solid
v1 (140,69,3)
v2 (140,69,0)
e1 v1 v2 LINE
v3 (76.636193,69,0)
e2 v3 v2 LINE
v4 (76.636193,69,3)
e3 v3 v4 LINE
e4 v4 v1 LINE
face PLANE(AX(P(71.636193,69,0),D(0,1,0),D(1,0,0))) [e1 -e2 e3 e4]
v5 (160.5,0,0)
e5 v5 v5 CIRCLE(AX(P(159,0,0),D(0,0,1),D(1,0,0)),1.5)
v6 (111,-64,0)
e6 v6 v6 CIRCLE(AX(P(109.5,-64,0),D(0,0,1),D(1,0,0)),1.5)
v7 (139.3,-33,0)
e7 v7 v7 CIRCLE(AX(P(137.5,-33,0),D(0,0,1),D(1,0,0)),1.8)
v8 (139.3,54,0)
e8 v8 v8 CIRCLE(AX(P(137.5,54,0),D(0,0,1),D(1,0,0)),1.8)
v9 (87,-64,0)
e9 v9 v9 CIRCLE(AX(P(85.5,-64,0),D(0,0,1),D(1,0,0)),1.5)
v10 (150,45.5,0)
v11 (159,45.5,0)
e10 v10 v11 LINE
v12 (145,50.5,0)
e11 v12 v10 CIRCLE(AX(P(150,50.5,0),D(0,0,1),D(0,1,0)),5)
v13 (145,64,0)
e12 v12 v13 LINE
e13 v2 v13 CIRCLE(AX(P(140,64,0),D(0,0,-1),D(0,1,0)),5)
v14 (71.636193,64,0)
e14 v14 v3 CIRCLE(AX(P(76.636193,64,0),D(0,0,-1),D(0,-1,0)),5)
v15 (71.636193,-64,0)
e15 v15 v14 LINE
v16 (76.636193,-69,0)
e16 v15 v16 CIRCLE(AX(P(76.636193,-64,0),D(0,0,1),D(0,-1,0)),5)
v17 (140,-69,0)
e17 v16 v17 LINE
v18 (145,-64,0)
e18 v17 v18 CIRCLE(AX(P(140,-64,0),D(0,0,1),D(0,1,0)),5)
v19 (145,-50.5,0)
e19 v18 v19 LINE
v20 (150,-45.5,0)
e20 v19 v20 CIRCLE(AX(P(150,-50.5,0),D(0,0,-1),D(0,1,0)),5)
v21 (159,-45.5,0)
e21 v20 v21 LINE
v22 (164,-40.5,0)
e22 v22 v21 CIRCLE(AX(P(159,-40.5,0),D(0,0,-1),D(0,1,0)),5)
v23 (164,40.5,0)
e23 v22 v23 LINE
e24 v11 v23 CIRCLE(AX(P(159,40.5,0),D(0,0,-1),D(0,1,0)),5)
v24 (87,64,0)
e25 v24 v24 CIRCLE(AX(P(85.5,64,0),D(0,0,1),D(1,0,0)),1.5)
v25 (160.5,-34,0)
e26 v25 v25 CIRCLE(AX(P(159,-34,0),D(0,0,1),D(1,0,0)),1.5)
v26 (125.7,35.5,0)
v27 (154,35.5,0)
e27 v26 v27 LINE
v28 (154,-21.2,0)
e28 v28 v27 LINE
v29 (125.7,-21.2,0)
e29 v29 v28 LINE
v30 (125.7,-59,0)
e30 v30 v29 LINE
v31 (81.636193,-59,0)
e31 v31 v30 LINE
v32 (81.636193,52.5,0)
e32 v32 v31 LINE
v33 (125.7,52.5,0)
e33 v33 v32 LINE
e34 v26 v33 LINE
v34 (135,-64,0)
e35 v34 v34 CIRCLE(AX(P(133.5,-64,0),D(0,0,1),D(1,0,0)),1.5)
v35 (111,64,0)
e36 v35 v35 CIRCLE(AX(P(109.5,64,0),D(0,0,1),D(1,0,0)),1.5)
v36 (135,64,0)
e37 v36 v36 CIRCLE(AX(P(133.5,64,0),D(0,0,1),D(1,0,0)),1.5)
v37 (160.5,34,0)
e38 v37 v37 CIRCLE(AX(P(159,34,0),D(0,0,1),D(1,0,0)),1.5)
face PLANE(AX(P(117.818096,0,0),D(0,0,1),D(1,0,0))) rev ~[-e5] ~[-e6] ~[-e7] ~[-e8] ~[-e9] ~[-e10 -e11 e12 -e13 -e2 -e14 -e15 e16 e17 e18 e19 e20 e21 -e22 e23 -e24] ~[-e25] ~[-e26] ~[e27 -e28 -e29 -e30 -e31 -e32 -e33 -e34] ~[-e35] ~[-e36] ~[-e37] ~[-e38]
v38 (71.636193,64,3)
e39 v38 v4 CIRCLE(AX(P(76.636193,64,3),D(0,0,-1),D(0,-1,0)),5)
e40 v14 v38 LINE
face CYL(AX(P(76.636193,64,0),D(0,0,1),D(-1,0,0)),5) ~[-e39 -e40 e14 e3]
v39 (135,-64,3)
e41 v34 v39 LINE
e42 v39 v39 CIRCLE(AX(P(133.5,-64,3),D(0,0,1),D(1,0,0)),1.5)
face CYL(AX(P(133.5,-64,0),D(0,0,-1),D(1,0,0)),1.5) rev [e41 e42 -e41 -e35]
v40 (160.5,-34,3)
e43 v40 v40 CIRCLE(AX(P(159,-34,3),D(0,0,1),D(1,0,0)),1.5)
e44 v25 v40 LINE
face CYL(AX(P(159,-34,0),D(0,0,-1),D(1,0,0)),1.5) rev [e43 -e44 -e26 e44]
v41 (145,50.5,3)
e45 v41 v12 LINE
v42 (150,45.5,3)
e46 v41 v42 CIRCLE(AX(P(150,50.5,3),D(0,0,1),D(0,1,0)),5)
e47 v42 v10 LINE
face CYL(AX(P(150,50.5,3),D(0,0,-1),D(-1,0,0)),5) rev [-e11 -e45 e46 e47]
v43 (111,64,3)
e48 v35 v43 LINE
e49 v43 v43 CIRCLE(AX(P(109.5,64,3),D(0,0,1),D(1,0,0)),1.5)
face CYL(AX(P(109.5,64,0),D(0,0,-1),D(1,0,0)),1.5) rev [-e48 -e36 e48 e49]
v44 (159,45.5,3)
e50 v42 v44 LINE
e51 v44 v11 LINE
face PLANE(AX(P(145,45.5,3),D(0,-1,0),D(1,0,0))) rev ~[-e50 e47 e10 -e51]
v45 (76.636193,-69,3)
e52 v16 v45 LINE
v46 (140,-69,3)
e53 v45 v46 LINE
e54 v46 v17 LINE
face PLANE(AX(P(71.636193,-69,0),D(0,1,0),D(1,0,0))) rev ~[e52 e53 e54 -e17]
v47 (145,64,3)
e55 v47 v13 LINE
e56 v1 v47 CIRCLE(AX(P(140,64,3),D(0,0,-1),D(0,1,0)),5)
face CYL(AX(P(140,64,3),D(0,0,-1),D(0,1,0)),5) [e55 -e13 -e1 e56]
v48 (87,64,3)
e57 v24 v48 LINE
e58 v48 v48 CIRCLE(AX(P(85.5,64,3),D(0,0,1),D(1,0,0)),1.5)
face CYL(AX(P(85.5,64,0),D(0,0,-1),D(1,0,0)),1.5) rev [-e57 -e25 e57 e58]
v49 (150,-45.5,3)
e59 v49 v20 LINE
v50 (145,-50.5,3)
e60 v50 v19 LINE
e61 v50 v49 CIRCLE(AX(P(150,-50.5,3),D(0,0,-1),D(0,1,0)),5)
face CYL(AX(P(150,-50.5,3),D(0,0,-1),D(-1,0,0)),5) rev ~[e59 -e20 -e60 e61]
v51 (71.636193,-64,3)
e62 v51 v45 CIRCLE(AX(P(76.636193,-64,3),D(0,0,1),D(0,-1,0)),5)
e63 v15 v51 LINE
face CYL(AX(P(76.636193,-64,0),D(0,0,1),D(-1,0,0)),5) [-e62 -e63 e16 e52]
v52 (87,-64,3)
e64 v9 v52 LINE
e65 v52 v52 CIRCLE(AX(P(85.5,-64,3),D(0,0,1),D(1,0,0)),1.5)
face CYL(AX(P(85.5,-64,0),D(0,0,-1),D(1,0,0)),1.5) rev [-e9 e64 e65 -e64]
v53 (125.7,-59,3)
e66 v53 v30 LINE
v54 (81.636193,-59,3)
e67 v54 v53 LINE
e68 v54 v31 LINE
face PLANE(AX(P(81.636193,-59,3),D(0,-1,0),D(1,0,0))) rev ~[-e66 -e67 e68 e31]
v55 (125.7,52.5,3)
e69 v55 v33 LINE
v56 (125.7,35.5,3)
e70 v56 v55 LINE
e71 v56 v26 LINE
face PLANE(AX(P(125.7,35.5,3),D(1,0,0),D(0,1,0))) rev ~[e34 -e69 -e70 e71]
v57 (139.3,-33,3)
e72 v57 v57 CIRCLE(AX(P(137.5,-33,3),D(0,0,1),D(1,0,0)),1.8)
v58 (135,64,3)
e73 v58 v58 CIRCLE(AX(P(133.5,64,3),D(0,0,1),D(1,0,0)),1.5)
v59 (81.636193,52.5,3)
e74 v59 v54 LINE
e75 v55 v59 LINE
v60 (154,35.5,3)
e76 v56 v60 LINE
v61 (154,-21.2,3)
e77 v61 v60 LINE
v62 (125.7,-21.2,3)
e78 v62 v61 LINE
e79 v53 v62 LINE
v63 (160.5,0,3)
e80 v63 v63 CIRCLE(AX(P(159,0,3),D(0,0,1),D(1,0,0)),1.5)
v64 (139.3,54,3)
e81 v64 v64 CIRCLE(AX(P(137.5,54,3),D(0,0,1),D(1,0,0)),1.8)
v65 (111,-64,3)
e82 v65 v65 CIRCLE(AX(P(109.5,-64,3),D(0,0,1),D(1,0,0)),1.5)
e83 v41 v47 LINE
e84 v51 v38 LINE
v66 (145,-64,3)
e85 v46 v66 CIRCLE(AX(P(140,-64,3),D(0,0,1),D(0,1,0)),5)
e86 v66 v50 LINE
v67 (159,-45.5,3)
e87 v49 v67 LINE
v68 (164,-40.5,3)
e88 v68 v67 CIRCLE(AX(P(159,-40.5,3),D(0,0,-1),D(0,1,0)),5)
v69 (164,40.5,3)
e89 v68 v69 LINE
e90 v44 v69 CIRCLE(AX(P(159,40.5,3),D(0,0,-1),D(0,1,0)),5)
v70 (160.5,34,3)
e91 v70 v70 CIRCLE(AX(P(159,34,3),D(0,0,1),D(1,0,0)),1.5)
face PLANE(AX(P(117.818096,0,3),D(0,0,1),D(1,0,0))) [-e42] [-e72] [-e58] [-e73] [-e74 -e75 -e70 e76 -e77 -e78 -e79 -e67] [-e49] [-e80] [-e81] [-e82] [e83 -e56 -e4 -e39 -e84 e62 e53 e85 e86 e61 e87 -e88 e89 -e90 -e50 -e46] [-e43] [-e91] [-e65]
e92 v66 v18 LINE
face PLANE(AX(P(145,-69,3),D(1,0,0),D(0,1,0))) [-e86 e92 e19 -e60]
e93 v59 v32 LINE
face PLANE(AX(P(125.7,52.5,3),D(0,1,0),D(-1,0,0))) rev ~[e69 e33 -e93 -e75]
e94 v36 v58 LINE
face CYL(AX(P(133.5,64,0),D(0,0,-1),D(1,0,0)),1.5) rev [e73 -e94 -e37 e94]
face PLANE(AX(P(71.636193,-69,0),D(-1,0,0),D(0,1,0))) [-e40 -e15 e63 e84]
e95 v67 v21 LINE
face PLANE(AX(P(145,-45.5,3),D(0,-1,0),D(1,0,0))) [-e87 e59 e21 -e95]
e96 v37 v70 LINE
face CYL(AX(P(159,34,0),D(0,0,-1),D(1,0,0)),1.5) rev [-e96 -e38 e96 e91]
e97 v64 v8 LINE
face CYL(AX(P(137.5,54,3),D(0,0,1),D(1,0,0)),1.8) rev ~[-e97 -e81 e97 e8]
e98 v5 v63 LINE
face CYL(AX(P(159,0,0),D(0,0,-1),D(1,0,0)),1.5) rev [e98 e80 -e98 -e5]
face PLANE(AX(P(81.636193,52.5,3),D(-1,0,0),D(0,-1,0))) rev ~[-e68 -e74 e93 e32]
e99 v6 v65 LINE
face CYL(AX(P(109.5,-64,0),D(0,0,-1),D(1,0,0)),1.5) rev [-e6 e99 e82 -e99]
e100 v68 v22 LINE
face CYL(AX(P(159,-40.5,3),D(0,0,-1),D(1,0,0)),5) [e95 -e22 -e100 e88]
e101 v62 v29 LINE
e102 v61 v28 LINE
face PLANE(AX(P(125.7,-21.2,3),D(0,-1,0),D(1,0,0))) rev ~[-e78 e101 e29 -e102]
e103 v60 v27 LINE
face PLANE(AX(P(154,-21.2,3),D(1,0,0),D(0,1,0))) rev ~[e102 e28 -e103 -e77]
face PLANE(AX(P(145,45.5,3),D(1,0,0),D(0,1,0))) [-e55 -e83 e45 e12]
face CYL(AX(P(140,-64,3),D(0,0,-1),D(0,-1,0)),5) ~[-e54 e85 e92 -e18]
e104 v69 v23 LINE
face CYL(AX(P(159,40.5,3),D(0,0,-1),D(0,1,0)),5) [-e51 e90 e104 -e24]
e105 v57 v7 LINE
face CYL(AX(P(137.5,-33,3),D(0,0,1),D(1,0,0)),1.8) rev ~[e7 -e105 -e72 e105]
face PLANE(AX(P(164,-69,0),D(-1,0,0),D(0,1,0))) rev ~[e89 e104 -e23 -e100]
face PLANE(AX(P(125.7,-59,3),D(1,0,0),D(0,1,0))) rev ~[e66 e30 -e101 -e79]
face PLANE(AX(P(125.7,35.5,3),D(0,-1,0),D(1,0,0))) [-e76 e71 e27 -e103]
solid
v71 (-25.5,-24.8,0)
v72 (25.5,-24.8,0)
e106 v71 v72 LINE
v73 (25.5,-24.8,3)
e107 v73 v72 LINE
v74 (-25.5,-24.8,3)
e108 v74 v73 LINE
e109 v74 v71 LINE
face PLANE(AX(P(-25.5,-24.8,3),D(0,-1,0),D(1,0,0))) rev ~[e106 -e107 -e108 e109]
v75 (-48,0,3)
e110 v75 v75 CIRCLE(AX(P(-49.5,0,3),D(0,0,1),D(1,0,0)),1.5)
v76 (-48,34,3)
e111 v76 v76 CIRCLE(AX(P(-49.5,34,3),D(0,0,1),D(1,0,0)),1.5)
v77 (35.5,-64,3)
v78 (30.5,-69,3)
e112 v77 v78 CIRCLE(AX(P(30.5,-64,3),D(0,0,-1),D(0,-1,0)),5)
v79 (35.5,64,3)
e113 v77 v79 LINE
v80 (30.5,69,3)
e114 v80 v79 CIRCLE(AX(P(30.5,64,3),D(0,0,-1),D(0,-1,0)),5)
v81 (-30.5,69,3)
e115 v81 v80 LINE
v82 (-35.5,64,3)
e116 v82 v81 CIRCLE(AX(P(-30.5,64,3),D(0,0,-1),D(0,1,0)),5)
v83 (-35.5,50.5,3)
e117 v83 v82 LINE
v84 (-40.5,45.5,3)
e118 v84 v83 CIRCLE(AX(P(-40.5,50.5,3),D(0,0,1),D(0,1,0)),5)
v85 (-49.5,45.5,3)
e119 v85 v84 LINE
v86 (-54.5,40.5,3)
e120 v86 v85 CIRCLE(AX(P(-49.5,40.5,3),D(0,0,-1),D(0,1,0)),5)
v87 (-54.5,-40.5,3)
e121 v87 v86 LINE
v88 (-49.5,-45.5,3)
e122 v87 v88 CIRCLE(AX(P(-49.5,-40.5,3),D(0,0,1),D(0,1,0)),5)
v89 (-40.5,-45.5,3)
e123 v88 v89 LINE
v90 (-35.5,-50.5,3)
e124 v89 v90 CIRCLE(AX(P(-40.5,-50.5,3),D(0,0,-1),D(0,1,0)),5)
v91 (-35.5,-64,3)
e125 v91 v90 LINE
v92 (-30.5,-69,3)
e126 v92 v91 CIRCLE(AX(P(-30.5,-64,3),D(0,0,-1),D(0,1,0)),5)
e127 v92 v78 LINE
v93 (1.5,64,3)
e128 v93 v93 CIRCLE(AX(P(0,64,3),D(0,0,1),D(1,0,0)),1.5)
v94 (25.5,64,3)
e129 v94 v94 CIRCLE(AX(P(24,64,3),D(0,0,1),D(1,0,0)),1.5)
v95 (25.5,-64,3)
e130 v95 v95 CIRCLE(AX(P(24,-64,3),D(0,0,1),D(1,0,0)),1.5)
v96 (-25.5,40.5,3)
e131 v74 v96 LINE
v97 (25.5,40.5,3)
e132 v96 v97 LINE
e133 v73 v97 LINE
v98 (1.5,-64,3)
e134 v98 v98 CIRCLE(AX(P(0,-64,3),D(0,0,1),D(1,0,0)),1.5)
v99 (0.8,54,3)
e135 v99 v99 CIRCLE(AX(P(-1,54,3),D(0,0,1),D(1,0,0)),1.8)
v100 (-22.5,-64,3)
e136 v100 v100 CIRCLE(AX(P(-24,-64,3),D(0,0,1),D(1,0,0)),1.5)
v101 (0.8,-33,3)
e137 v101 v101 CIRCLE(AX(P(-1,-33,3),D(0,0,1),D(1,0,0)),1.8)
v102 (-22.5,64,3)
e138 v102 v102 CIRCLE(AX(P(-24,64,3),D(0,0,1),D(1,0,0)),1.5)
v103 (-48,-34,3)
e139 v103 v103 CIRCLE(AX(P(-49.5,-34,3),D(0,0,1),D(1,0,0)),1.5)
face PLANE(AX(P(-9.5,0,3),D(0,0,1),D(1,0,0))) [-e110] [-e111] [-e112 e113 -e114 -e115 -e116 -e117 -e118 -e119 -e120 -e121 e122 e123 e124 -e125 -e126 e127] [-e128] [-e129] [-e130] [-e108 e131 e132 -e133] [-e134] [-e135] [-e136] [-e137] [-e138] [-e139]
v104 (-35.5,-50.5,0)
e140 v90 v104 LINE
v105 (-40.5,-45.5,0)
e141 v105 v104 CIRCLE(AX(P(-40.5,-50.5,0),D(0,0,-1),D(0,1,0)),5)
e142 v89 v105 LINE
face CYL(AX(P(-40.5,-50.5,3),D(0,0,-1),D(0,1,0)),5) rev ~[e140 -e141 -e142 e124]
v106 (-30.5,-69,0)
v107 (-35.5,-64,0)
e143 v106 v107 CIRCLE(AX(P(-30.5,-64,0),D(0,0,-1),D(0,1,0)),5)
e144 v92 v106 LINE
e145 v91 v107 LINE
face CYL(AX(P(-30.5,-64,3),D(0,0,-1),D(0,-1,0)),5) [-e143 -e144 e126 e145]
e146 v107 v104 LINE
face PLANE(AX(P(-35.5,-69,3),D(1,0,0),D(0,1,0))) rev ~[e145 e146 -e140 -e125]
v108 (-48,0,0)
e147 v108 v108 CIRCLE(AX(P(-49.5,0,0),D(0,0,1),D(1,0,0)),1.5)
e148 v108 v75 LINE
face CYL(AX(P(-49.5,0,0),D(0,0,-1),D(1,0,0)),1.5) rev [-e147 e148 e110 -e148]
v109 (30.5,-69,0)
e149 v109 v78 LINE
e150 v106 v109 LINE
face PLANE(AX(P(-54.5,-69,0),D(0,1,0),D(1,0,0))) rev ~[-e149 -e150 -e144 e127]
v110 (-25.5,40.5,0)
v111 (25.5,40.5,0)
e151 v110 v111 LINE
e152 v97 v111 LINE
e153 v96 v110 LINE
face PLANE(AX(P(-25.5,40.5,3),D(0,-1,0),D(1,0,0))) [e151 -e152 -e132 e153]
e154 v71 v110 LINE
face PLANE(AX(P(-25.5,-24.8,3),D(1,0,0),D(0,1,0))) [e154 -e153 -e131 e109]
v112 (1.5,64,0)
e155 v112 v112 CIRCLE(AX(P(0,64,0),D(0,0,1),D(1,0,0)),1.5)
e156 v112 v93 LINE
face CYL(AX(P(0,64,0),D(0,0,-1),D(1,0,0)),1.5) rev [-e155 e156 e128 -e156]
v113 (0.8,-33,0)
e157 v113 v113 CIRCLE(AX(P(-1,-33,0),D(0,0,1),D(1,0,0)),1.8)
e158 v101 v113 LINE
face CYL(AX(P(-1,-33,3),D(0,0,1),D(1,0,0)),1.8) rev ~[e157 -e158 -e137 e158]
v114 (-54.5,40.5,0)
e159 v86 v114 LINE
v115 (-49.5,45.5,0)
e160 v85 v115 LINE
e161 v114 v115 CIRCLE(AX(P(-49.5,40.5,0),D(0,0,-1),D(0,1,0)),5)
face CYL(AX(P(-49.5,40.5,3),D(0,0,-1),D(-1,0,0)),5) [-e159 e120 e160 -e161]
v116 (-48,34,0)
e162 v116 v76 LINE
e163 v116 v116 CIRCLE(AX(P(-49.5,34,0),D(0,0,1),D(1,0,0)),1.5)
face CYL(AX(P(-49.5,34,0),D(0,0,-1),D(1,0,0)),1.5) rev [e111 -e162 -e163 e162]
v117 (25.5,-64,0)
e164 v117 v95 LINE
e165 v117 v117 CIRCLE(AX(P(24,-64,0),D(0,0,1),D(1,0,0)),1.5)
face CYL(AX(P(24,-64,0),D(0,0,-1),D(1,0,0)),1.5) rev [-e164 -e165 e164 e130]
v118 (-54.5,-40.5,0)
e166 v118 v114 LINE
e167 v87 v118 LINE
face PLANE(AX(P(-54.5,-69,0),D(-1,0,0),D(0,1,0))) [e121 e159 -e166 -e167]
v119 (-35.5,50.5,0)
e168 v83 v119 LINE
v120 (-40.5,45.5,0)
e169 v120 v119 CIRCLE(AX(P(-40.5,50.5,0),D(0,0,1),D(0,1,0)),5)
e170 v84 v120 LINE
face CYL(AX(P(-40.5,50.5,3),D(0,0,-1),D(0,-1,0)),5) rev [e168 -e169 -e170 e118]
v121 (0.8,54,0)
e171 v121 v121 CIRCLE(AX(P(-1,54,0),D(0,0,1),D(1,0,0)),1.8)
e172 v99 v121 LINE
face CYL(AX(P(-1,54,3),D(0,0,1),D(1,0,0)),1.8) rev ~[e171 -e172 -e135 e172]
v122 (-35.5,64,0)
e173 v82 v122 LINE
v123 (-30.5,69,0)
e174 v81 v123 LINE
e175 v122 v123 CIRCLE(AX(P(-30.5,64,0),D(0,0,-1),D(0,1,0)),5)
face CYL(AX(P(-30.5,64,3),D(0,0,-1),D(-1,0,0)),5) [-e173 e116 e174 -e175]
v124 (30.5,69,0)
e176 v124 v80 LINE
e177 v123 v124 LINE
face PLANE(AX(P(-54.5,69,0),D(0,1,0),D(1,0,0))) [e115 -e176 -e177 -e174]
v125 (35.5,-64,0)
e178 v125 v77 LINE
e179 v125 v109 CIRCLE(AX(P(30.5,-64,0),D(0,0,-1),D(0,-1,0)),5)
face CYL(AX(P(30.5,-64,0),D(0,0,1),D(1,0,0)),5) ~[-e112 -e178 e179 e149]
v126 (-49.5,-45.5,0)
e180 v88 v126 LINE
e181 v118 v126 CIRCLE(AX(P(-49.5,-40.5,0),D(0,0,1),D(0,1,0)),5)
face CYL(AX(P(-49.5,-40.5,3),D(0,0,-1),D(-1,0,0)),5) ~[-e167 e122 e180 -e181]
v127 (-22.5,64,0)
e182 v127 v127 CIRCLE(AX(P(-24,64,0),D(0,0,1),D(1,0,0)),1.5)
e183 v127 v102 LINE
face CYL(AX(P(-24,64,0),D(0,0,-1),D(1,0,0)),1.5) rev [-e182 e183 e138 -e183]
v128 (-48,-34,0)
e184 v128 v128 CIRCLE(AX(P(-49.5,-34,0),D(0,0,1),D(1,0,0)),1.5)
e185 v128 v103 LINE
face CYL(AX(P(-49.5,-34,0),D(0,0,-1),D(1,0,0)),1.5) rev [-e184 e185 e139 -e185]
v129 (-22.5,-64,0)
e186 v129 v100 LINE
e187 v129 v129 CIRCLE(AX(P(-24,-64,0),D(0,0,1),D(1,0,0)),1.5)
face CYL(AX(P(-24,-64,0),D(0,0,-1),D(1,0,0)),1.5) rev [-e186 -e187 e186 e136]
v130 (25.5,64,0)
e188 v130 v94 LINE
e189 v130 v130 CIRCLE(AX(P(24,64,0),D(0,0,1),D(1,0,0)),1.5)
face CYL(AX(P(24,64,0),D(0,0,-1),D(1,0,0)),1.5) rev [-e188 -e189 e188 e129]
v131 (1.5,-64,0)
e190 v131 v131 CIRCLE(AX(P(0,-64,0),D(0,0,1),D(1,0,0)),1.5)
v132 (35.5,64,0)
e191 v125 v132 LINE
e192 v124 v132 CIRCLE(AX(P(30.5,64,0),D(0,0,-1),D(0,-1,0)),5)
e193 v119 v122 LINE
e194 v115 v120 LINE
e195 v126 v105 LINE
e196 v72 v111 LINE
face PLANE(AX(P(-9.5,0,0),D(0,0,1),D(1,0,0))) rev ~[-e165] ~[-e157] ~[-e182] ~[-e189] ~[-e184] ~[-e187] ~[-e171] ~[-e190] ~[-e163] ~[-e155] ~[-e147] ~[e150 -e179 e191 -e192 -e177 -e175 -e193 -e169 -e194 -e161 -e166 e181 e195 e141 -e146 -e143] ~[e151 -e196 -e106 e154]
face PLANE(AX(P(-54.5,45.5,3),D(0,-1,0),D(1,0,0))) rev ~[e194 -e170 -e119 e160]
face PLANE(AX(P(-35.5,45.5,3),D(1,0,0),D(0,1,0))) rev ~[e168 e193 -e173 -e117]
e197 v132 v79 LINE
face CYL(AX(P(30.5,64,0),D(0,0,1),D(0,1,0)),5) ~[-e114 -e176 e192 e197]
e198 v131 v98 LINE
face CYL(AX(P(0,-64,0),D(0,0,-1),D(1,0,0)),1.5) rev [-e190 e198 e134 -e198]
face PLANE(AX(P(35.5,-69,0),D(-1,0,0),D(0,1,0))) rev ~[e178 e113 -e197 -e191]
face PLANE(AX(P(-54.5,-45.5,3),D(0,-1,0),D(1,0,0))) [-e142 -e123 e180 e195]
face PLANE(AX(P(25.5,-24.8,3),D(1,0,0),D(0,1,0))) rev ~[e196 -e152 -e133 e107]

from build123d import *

# Parameters (mm, degrees)
F0_W      = 90
F0_H      = 138
F0_R      = 1.5
F1_DEPTH  = 3
F0_W_2    = 92.3638074994
F2_W      = 19
F2_H      = 23.5
F3_DEPTH  = 25
F4_W      = 19
F4_H      = 23.5
F5_DEPTH  = 25
F6_R      = 5
F6_2_R    = 5
F7_R      = 1.8
F8_DEPTH  = 25
F9_W      = 28.3
F9_H      = 56.7
F10_DEPTH = 25
F11_W     = 51
F11_H     = 65.3
F12_DEPTH = 25


# Not quite as in the source:
# - a feature names something its author has since deleted; it is built from what else it names


with BuildPart() as f1:
    # F0 (on Top) → F1 (new body)
    with BuildSketch(Plane.XY):
        with Locations((-9.5, 0)):
            Rectangle(F0_W, F0_H)
        with Locations((-24, -64)):
            Circle(F0_R, mode=Mode.SUBTRACT)
        with Locations((0, -64)):
            Circle(F0_R, mode=Mode.SUBTRACT)
        with Locations((24, -64)):
            Circle(F0_R, mode=Mode.SUBTRACT)
        with Locations((-49.5, -34)):
            Circle(F0_R, mode=Mode.SUBTRACT)
        with Locations((-49.5, 0)):
            Circle(F0_R, mode=Mode.SUBTRACT)
        with Locations((-49.5, 34)):
            Circle(F0_R, mode=Mode.SUBTRACT)
        with Locations((-24, 64)):
            Circle(F0_R, mode=Mode.SUBTRACT)
        with Locations((0, 64)):
            Circle(F0_R, mode=Mode.SUBTRACT)
        with Locations((24, 64)):
            Circle(F0_R, mode=Mode.SUBTRACT)
    extrude(amount=F1_DEPTH)

    # F2 (on face) → F3 (cut)
    with BuildSketch(Plane.XY.offset(3)):
        with Locations((-45, 57.25)):
            Rectangle(F2_W, F2_H)
        with Locations((-45, -57.25)):
            Rectangle(F2_W, F2_H)
    extrude(amount=-F3_DEPTH, mode=Mode.SUBTRACT)

    # F6
    f6_edges = [f1.edges().sort_by_distance(p)[0] for p in [
        (-54.5, 45.5, 1.5),
        (-54.5, -45.5, 1.5),
        (-35.5, -45.5, 1.5),
        (-35.5, -69, 1.5),
        (35.5, -69, 1.5),
        (35.5, 69, 1.5),
        (-35.5, 69, 1.5),
        (-35.5, 45.5, 1.5),
    ]]
    fillet(f6_edges, radius=F6_R)


with BuildPart() as f1b:
    # F0 (on Top) → F1, piece 2 (new body)
    with BuildSketch(Plane.XY):
        with Locations((117.8180962503, 0)):
            Rectangle(F0_W_2, F0_H)
        with Locations((85.5, -64)):
            Circle(F0_R, mode=Mode.SUBTRACT)
        with Locations((109.5, -64)):
            Circle(F0_R, mode=Mode.SUBTRACT)
        with Locations((133.5, -64)):
            Circle(F0_R, mode=Mode.SUBTRACT)
        with Locations((159, -34)):
            Circle(F0_R, mode=Mode.SUBTRACT)
        with Locations((159, 0)):
            Circle(F0_R, mode=Mode.SUBTRACT)
        with Locations((159, 34)):
            Circle(F0_R, mode=Mode.SUBTRACT)
        with Locations((85.5, 64)):
            Circle(F0_R, mode=Mode.SUBTRACT)
        with Locations((109.5, 64)):
            Circle(F0_R, mode=Mode.SUBTRACT)
        with Locations((133.5, 64)):
            Circle(F0_R, mode=Mode.SUBTRACT)
    extrude(amount=F1_DEPTH)

    # F4 (on face) → F5 (cut)
    with BuildSketch(Plane.XY.offset(3)):
        with Locations((154.5, 57.25)):
            Rectangle(F4_W, F4_H)
        with Locations((154.5, -57.25)):
            Rectangle(F4_W, F4_H)
    extrude(amount=-F5_DEPTH, mode=Mode.SUBTRACT)

    # F6#2
    f6_2_edges = [f1b.edges().sort_by_distance(p)[0] for p in [
        (71.636193, 69, 1.5),
        (145, 69, 1.5),
        (145, 45.5, 1.5),
        (164, 45.5, 1.5),
        (164, -45.5, 1.5),
        (145, -45.5, 1.5),
        (145, -69, 1.5),
        (71.636193, -69, 1.5),
    ]]
    fillet(f6_2_edges, radius=F6_2_R)


with BuildPart() as f8_tool:
    # F7 (on face) → F8 (new body)
    with BuildSketch(Plane.XY.offset(3)):
        with Locations((-1, 54)):
            Circle(F7_R)
        with Locations((-1, -33)):
            Circle(F7_R)
        with Locations((137.5, -33)):
            Circle(F7_R)
        with Locations((137.5, 54)):
            Circle(F7_R)
    extrude(amount=-F8_DEPTH)


with BuildPart() as f1_1:
    add(f1.part)

    # F8: cut by f8_tool
    add(f8_tool.part, mode=Mode.SUBTRACT)

    # F11 (on face) → F12 (cut)
    with BuildSketch(Plane.XY.offset(3)):
        with Locations((0, 7.85)):
            Rectangle(F11_W, F11_H)
    extrude(amount=-F12_DEPTH, mode=Mode.SUBTRACT)


with BuildPart() as f1b_1:
    add(f1b.part)

    # F8: cut by f8_tool
    add(f8_tool.part, mode=Mode.SUBTRACT)

    # F9 (on face) → F10 (cut)
    with BuildSketch(Plane.XY.offset(3)):
        Polygon((125.7, 52.5), (81.6361925006, 52.5), (81.6361925006, -59), (125.7, -59), (125.7, -21.2), (125.7, 35.5), align=None)
        with Locations((139.85, 7.15)):
            Rectangle(F9_W, F9_H)
    extrude(amount=-F10_DEPTH, mode=Mode.SUBTRACT)


solid = Compound([f1_1.part, f1b_1.part])
